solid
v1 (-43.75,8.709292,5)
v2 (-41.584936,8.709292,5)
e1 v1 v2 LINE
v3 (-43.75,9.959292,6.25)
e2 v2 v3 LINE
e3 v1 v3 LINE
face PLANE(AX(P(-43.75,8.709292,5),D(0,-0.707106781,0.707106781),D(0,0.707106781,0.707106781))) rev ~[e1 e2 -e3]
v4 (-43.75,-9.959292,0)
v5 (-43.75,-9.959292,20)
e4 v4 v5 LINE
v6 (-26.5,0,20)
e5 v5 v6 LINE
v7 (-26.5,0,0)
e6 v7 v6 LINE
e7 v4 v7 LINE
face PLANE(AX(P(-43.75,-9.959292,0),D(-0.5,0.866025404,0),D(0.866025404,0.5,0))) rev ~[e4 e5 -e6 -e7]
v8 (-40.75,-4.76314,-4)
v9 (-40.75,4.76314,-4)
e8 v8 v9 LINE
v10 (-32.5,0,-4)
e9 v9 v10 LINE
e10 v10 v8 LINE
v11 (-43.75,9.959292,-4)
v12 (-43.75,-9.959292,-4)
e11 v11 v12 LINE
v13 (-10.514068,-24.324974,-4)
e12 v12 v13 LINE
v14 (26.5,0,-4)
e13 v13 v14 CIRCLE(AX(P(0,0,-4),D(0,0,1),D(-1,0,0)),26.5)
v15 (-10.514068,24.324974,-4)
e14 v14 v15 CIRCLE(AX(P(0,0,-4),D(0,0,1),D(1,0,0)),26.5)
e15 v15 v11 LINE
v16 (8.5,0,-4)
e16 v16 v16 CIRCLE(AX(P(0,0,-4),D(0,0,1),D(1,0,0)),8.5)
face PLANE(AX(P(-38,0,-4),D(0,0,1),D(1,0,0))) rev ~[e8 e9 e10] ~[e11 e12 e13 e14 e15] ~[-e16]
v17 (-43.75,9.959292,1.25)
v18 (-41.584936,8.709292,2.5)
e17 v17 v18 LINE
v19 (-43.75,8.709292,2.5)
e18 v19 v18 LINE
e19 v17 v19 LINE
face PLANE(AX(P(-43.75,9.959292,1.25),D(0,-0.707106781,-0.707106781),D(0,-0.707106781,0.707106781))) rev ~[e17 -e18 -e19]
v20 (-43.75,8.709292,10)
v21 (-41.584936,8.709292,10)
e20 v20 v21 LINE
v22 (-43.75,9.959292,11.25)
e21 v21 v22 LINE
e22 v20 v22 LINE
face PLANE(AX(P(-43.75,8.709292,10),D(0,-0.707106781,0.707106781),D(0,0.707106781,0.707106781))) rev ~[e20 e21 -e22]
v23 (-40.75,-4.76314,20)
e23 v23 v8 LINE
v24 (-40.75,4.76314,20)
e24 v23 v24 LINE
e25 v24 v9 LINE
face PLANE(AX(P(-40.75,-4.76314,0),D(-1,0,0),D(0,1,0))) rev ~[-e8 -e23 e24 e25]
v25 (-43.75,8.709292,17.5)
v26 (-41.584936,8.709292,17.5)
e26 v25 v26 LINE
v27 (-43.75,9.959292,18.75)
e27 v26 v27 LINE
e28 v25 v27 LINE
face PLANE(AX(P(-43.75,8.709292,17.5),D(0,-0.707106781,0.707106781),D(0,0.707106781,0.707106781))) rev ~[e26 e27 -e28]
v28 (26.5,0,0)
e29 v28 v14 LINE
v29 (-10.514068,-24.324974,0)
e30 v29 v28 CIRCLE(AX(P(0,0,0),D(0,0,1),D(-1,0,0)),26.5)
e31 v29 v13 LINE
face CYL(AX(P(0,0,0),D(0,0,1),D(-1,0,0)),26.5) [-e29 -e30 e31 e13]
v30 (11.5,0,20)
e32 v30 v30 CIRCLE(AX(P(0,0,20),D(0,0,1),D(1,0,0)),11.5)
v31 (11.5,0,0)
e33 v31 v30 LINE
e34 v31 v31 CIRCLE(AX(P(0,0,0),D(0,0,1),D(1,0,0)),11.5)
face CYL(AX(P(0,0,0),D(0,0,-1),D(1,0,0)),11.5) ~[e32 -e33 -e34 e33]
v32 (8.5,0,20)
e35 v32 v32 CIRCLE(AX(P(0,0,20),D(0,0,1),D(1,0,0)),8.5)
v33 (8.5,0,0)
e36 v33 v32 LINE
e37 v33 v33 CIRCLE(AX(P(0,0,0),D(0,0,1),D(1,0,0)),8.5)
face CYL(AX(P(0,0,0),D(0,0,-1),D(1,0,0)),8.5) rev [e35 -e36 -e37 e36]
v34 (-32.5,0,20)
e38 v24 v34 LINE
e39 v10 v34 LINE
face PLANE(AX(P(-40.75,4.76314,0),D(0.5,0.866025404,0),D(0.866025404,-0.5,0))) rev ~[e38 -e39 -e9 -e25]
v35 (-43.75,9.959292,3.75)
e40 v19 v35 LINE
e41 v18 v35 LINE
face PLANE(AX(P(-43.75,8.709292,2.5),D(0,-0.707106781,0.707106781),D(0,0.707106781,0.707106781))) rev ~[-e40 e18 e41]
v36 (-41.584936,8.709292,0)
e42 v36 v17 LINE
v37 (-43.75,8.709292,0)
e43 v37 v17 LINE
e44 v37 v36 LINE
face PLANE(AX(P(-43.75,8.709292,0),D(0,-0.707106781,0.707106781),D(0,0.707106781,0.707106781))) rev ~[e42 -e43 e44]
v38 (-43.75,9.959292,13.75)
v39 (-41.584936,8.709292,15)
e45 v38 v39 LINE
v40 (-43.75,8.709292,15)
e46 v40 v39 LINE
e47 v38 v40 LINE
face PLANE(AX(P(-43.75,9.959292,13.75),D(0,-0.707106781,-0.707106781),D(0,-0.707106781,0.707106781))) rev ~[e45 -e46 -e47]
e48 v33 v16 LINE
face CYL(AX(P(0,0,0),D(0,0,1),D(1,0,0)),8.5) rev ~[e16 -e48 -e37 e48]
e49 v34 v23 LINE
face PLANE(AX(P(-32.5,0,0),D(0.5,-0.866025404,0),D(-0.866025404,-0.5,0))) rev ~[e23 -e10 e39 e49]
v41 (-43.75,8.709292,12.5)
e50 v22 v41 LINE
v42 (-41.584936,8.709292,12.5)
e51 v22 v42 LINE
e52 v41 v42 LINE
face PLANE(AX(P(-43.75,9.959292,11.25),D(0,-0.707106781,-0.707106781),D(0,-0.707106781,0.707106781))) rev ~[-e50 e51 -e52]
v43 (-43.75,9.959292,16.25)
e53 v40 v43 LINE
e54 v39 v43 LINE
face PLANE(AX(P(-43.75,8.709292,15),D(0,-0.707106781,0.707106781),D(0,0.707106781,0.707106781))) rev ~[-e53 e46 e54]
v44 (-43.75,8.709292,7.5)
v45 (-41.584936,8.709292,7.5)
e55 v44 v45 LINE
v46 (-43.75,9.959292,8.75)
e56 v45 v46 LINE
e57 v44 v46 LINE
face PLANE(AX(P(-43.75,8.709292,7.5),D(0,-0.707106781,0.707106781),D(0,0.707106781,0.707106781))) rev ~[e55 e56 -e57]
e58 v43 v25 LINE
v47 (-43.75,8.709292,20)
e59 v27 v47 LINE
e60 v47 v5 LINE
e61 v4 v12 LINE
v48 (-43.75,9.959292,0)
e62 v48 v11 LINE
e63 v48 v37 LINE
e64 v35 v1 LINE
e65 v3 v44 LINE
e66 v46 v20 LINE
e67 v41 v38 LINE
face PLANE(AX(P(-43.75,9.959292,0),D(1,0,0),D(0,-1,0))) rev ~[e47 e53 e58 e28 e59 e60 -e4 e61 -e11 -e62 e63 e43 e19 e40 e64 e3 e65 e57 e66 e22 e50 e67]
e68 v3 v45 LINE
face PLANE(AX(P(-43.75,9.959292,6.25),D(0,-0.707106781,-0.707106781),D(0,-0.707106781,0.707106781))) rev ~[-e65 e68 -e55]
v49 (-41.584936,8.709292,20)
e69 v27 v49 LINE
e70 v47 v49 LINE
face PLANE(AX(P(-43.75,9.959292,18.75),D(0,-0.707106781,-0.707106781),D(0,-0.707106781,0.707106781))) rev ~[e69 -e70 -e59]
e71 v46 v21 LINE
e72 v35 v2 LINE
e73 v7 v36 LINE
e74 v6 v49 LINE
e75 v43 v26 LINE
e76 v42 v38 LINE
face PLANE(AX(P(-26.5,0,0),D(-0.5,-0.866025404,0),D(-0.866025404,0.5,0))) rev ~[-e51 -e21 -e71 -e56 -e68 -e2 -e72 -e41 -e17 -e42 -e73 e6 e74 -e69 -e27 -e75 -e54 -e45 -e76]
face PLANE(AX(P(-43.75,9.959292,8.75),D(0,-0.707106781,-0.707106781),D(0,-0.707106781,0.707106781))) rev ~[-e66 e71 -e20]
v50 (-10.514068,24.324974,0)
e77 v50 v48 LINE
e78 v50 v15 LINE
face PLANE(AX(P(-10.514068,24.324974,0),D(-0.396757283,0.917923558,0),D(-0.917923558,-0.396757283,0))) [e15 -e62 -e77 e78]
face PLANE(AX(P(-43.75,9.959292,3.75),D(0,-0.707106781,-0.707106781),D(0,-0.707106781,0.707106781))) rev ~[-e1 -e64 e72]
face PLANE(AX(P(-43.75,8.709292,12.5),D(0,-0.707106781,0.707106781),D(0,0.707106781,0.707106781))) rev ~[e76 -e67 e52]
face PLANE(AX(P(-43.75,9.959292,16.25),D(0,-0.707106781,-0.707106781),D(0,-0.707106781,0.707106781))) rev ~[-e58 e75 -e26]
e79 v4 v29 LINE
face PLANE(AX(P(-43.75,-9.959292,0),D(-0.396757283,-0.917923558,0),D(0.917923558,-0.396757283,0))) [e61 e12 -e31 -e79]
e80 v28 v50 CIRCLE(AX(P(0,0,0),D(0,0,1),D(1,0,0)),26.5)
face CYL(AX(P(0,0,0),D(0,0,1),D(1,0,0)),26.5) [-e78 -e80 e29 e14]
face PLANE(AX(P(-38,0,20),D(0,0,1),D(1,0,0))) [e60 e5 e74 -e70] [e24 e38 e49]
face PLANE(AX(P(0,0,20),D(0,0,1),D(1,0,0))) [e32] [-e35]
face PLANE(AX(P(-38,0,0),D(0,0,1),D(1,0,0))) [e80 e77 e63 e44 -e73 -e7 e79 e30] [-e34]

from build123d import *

# Parameters (mm, degrees)
F0_R     = 11.5
F0_R_2   = 8.5
F1_DEPTH = 4
F2_DEPTH = 20
F4_DEPTH = 10


# Not quite as in the source:
# - a feature names something its author has since deleted; it is built from what else it names


with BuildPart() as f1:
    # F0 (on Top) → F1 (new body)
    with BuildSketch(Plane.XY):
        Polygon((-43.75, -9.9592921435), (-26.5, 0), (-43.75, 9.9592921435), align=None)
        Polygon((-32.5, 0), (-40.75, -4.7631397208), (-40.75, 4.7631397208), align=None, mode=Mode.SUBTRACT)
        with BuildLine():
            Line((-43.75, 9.9592921435), (-26.5, 0))
            ThreePointArc((-26.5, 0), (-22.1457987188, 14.5538173379), (-10.514067992, 24.324974291))
            Line((-10.514067992, 24.324974291), (-43.75, 9.9592921435))
        make_face()
        with BuildLine():
            ThreePointArc((-10.514067992, 24.324974291), (-22.1457987188, 14.5538173379), (-26.5, 0))
            ThreePointArc((-26.5, 0), (-22.1457987188, -14.5538173379), (-10.514067992, -24.324974291))
            ThreePointArc((-10.514067992, -24.324974291), (14.5538173379, -22.1457987188), (26.5, 0))
            ThreePointArc((26.5, 0), (14.5538173379, 22.1457987188), (-10.514067992, 24.324974291))
        make_face()
        Circle(F0_R, mode=Mode.SUBTRACT)
        Circle(F0_R)
        Circle(F0_R_2, mode=Mode.SUBTRACT)
        with BuildLine():
            ThreePointArc((-10.514067992, -24.324974291), (-22.1457987188, -14.5538173379), (-26.5, 0))
            Line((-26.5, 0), (-43.75, -9.9592921435))
            Line((-43.75, -9.9592921435), (-10.514067992, -24.324974291))
        make_face()
    extrude(amount=-F1_DEPTH)

    # F0 (on Top) → F2 (join)
    with BuildSketch(Plane.XY):
        Polygon((-43.75, -9.9592921435), (-26.5, 0), (-43.75, 9.9592921435), align=None)
        Polygon((-32.5, 0), (-40.75, -4.7631397208), (-40.75, 4.7631397208), align=None, mode=Mode.SUBTRACT)
        Circle(F0_R)
        Circle(F0_R_2, mode=Mode.SUBTRACT)
    extrude(amount=F2_DEPTH)

    # F3 (on face) → F4 (cut)
    with BuildSketch(Plane(origin=(-43.75, 0, 0), x_dir=(0, -1, 0), z_dir=(-1, 0, 0))):
        Polygon((-9.9592921435, 1.25), (-9.9592921435, 0), (-8.7092921435, 0), align=None)
        Polygon((-9.9592921435, 3.75), (-9.9592921435, 1.25), (-8.7092921435, 2.5), align=None)
        Polygon((-8.7092921435, 5), (-9.9592921435, 6.25), (-9.9592921435, 3.75), align=None)
        Polygon((-8.7092921435, 7.5), (-9.9592921435, 8.75), (-9.9592921435, 6.25), align=None)
        Polygon((-8.7092921435, 10), (-9.9592921435, 11.25), (-9.9592921435, 8.75), align=None)
        Polygon((-8.7092921435, 12.5), (-9.9592921435, 13.75), (-9.9592921435, 11.25), align=None)
        Polygon((-8.7092921435, 15), (-9.9592921435, 16.25), (-9.9592921435, 13.75), align=None)
        Polygon((-8.7092921435, 17.5), (-9.9592921435, 18.75), (-9.9592921435, 16.25), align=None)
        Polygon((-9.9592921435, 18.75), (-8.7092921435, 20), (-9.9592921435, 20), align=None)
    extrude(amount=-F4_DEPTH, mode=Mode.SUBTRACT)


solid = f1.part
